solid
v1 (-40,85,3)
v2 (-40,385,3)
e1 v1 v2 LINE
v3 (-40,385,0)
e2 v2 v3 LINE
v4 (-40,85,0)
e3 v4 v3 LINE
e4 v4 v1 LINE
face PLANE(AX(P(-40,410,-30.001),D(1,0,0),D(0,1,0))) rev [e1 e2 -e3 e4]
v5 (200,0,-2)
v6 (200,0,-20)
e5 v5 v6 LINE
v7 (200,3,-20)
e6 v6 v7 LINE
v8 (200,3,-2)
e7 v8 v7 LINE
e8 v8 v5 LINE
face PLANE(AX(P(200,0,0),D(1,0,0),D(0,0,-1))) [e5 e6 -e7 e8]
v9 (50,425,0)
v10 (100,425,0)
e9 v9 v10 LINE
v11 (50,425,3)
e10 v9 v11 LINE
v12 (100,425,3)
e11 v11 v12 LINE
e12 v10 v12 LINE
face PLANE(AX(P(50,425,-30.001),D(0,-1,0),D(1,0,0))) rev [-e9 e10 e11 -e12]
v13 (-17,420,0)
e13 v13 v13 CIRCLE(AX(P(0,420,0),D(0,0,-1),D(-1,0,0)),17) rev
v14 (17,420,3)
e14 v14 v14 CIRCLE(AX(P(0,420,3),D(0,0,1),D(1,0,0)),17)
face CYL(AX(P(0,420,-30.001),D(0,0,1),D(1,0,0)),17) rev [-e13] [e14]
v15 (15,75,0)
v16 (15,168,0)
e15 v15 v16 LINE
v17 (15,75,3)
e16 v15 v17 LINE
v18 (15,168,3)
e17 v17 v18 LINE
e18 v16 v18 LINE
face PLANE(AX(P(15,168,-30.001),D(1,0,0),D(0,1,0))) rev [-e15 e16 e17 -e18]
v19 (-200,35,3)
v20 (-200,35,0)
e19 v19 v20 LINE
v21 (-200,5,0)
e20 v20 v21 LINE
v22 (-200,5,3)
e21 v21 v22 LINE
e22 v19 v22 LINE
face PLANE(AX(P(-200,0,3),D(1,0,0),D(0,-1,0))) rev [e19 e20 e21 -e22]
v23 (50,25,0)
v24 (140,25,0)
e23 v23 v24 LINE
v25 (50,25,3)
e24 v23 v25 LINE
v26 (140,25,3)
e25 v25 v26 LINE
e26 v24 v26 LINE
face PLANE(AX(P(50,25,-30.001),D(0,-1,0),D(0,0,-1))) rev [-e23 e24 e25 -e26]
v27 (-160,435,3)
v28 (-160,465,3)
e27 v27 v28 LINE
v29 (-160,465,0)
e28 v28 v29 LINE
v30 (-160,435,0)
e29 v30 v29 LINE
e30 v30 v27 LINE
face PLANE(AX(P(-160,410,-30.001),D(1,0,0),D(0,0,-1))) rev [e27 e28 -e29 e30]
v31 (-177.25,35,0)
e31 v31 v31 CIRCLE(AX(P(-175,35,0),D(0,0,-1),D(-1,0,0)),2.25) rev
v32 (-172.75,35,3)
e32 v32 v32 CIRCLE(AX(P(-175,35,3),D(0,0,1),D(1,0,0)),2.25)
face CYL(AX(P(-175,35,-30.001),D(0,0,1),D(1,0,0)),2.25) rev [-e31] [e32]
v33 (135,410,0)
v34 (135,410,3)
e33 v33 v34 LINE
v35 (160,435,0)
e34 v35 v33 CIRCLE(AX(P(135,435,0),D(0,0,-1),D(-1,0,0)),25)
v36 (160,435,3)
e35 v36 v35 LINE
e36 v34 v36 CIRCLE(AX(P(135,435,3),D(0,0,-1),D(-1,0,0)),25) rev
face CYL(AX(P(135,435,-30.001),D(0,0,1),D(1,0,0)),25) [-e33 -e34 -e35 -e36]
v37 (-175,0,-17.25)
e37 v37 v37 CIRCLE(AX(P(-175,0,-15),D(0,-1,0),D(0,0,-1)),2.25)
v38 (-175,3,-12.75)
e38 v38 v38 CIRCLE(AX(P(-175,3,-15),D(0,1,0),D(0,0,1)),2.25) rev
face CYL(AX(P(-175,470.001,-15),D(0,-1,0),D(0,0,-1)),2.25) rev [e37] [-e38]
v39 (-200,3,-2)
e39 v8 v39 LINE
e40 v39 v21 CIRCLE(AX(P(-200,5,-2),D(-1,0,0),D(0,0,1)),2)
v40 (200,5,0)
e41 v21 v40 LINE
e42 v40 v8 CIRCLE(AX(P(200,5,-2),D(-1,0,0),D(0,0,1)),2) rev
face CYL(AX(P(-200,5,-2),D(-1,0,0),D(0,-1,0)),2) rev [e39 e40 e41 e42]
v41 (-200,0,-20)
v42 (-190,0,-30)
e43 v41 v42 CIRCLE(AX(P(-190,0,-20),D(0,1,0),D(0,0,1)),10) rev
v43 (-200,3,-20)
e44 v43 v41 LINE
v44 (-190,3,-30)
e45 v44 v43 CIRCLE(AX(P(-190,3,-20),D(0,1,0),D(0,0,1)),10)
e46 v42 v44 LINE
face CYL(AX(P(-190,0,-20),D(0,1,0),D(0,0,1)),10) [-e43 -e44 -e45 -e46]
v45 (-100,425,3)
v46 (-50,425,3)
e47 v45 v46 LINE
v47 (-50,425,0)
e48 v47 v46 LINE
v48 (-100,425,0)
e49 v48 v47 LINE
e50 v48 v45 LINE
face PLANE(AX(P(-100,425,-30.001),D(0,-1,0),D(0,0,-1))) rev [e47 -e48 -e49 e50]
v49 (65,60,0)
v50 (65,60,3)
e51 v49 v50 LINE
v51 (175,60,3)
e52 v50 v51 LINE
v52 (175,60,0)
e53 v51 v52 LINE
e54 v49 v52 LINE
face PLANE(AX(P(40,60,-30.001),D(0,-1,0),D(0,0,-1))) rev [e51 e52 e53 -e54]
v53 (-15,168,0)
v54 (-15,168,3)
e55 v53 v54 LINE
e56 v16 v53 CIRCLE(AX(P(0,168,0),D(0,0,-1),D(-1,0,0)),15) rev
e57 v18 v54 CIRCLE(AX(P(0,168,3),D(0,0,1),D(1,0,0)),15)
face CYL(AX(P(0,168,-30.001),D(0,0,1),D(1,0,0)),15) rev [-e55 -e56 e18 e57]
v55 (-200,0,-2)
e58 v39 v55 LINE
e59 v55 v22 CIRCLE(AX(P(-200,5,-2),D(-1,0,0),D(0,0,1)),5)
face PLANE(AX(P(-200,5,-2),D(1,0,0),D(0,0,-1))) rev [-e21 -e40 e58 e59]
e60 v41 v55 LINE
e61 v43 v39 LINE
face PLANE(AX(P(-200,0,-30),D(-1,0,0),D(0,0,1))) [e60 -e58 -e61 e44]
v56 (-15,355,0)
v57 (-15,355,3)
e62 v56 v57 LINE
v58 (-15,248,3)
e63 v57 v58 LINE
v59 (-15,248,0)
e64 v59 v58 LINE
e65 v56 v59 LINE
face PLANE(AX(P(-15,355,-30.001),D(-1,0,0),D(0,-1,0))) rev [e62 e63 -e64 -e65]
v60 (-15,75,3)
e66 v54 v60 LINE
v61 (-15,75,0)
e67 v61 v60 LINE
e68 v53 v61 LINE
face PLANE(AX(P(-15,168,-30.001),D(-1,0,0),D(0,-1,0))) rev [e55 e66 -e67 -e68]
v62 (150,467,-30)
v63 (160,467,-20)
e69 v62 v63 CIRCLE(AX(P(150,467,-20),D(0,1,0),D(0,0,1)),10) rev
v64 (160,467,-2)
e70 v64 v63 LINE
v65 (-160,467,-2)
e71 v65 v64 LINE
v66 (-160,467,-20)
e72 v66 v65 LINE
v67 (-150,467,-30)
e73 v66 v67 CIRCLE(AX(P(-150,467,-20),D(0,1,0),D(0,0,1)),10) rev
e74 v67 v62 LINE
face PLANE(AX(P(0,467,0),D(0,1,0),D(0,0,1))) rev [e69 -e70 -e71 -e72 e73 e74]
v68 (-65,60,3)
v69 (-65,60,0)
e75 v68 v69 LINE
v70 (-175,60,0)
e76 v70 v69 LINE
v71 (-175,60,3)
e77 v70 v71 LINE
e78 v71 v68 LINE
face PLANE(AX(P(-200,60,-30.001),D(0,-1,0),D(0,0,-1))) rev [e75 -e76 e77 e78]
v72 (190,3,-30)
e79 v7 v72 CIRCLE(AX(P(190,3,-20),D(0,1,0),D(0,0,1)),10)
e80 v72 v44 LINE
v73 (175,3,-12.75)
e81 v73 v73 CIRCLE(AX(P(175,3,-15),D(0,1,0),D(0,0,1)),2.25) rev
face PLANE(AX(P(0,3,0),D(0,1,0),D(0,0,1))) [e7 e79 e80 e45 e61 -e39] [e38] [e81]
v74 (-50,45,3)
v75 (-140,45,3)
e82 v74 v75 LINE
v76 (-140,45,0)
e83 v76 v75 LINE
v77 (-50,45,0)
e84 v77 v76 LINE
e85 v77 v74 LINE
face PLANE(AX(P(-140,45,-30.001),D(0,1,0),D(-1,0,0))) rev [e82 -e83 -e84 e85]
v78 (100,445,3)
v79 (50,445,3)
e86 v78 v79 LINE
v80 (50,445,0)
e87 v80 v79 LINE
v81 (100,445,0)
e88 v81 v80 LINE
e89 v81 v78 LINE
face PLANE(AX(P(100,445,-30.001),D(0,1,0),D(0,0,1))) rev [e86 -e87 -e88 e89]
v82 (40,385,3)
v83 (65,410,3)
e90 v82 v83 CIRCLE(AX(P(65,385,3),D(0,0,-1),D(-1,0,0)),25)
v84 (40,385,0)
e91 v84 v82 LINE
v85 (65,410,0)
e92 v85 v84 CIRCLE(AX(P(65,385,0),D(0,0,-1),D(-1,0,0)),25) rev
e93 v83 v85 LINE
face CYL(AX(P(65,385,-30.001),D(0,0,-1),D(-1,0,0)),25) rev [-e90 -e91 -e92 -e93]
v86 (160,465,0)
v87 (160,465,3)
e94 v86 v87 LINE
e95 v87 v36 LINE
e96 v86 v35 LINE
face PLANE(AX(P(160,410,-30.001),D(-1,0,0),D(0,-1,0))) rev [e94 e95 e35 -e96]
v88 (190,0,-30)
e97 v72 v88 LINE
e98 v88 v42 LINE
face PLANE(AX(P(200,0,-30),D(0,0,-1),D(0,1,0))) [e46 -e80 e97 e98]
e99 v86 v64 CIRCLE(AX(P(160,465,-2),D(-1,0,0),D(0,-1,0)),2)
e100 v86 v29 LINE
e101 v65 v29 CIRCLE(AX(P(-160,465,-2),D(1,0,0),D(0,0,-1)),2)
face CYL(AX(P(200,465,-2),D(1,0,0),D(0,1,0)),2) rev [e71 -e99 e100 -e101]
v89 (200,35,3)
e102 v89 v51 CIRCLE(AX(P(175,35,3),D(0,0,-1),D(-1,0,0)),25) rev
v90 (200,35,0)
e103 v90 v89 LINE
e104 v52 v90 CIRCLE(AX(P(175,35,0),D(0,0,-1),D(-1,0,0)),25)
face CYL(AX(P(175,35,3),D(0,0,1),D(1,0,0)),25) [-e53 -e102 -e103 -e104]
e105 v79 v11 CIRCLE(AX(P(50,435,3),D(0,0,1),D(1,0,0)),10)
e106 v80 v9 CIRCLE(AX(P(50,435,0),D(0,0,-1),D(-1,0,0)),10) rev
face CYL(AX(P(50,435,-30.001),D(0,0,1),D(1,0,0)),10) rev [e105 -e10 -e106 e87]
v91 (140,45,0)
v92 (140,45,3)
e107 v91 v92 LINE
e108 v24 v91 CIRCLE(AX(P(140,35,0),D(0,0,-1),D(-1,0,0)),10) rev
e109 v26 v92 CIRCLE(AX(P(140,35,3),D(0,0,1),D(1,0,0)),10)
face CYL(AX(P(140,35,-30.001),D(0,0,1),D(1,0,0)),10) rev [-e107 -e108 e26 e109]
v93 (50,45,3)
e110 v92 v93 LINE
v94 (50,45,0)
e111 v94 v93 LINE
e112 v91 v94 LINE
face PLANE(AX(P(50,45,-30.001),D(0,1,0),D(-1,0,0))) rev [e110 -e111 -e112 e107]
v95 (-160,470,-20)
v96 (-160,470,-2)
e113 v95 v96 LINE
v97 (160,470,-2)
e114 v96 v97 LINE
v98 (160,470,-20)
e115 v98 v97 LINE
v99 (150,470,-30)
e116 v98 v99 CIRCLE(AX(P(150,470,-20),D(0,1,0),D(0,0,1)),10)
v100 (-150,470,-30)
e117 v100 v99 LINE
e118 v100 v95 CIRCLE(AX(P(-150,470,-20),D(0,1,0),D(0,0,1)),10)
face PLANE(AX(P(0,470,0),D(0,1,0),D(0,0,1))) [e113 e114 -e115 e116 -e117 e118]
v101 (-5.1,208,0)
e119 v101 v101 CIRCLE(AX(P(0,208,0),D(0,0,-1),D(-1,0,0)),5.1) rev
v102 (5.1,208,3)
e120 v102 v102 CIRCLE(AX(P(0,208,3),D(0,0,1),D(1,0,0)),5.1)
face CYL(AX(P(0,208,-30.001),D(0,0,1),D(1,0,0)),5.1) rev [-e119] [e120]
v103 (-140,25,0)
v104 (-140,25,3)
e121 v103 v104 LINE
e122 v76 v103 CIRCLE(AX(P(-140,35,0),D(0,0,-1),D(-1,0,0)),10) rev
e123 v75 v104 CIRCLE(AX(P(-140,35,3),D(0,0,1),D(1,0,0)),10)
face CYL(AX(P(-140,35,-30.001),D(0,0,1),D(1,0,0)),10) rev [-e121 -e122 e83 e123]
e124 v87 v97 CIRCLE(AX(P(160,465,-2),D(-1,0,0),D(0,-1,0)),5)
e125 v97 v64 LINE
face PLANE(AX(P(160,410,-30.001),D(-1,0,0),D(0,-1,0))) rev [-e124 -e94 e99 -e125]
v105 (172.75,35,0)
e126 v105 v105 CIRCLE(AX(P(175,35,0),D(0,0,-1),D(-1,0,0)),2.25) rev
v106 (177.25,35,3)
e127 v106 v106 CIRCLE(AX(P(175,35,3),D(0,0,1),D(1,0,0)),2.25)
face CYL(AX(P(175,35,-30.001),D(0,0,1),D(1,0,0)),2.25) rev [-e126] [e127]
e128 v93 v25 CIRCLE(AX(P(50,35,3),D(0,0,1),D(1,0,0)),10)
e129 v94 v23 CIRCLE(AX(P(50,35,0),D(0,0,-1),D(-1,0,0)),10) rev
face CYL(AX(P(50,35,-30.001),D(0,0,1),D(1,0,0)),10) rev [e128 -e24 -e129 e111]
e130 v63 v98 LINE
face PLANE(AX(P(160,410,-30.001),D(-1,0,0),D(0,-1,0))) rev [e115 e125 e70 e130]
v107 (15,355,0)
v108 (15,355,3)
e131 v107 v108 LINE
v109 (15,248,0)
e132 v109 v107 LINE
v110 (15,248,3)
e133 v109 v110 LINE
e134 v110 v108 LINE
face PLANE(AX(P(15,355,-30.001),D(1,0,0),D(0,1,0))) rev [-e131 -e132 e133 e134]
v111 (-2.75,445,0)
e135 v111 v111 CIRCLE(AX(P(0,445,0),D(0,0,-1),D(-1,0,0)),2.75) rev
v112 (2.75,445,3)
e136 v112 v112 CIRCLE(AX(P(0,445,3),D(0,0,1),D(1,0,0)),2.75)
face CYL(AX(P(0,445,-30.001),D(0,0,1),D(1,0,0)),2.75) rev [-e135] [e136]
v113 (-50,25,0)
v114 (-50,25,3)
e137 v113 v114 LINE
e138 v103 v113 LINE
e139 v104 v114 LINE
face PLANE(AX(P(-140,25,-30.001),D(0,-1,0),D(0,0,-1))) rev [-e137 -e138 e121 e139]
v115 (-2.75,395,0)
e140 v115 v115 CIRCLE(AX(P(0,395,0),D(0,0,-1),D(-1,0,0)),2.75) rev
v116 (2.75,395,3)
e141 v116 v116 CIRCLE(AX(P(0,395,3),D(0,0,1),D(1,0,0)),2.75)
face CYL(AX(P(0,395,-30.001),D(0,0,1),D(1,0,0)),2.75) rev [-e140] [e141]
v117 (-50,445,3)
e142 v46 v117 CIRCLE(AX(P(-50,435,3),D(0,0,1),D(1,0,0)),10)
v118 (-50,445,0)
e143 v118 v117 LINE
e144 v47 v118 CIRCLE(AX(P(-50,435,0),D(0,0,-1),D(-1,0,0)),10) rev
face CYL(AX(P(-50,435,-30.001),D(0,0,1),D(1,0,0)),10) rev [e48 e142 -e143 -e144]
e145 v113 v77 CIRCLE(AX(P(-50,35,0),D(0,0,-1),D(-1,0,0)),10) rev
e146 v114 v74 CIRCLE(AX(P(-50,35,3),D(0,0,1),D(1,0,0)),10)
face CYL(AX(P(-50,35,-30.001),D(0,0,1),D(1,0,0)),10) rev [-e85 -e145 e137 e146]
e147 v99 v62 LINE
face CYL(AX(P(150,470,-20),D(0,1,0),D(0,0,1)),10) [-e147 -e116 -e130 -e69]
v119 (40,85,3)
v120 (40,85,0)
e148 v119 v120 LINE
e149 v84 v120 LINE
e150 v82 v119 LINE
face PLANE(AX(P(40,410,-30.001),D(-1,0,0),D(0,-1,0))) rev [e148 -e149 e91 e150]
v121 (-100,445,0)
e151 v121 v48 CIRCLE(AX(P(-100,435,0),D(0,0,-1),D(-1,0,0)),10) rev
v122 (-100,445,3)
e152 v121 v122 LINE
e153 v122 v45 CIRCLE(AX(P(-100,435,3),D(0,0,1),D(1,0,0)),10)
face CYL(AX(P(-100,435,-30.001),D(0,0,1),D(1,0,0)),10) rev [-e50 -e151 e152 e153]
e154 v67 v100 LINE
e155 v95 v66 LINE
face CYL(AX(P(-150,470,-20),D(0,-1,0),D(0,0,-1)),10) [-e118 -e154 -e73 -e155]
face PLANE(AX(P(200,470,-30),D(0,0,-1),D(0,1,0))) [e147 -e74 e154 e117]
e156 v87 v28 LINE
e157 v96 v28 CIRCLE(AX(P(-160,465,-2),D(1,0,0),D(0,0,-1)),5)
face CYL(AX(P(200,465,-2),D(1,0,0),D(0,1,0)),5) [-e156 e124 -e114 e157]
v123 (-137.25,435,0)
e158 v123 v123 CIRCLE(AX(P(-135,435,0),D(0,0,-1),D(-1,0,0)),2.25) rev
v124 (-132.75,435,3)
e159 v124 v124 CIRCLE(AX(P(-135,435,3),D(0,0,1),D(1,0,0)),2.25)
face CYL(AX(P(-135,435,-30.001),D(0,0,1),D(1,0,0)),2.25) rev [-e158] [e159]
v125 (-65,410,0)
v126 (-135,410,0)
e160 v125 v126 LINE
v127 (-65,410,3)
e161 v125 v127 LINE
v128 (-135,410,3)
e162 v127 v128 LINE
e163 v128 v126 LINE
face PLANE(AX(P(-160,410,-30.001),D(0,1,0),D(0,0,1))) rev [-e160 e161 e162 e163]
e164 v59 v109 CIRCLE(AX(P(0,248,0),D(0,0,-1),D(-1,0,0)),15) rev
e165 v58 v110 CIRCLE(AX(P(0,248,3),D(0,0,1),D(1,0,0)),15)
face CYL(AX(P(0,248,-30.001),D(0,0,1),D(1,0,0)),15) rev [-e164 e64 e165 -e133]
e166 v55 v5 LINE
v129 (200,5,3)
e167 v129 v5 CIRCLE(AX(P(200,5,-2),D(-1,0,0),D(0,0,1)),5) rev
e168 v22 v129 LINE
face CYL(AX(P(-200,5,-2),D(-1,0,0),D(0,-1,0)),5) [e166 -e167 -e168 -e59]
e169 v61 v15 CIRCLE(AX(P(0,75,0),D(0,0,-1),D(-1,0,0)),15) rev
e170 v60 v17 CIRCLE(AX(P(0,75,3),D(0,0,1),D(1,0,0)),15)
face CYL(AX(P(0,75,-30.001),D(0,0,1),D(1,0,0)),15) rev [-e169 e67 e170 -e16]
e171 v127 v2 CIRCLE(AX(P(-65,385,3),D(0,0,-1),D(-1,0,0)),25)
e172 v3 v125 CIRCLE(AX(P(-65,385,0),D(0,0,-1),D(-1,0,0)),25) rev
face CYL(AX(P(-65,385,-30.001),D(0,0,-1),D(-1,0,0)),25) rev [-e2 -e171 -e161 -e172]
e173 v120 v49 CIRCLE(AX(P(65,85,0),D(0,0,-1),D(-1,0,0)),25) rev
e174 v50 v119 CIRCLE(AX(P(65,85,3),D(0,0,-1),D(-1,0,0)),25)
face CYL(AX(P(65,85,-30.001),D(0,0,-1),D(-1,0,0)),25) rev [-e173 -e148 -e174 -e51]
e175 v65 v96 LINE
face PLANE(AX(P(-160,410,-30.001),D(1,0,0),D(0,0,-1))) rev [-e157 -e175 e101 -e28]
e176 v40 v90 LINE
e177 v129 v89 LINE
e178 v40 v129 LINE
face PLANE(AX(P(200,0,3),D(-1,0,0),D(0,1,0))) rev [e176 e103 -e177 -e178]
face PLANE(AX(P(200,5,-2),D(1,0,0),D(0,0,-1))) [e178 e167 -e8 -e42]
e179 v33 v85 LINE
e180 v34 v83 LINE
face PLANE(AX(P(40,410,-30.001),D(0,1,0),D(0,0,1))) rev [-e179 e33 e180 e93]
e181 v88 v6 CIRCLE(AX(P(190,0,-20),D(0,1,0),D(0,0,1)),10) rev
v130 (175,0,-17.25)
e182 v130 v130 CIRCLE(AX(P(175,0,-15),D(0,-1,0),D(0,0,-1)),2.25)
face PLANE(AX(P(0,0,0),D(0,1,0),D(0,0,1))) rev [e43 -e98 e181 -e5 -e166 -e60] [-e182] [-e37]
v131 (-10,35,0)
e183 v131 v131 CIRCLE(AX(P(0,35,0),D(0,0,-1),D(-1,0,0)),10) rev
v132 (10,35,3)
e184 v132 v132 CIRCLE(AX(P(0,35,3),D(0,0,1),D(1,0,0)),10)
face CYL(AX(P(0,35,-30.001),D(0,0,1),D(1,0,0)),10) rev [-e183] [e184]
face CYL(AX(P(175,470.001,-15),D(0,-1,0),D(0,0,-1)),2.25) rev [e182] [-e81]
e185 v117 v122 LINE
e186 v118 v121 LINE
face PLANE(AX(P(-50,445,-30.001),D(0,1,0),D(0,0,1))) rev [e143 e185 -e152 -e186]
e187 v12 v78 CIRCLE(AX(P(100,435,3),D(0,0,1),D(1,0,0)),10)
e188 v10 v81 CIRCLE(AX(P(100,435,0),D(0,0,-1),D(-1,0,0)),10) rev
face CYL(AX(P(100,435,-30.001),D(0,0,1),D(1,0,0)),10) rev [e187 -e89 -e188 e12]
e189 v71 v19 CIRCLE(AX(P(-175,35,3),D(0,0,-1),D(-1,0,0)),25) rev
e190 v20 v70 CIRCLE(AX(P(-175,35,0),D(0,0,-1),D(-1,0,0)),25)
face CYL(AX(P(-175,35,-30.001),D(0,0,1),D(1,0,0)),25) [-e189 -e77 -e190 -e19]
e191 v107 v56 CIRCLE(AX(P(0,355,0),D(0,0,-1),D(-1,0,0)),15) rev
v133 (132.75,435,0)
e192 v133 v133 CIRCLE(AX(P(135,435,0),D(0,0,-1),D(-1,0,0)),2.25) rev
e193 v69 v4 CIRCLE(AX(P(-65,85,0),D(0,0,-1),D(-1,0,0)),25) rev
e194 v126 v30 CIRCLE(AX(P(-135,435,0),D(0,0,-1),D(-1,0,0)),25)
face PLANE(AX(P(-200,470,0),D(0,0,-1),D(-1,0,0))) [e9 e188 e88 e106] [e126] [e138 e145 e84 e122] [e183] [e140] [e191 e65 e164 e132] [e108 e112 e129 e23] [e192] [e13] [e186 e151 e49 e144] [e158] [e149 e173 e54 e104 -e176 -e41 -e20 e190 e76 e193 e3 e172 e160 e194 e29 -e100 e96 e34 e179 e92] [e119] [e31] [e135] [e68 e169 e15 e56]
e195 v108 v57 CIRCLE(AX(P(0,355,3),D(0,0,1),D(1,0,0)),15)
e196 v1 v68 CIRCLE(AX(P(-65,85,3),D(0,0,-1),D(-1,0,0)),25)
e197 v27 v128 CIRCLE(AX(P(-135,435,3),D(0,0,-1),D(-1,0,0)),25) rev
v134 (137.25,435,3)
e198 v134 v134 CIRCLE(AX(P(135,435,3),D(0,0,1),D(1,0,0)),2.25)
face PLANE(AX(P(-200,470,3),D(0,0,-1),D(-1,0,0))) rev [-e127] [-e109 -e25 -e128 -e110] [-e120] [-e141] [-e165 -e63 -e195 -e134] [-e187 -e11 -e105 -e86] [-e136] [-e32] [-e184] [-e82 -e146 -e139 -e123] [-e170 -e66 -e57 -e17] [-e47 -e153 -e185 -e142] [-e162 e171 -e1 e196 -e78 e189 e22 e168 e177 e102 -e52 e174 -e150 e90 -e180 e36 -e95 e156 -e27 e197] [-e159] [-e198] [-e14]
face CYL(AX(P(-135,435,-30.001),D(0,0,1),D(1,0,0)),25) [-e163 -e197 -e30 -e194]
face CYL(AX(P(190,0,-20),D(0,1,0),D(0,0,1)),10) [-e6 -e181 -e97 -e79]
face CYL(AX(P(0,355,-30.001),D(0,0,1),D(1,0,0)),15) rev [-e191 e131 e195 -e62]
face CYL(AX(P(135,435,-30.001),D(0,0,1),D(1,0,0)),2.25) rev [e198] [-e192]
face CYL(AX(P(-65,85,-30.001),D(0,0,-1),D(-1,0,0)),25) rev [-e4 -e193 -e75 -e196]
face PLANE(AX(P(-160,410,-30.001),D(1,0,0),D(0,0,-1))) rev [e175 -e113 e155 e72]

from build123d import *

# Parameters (mm, degrees)
ESQUISSE1_W                             = 400
ESQUISSE1_H                             = 470
BOSS_EXTRU_1_DEPTH                      = 3
T_LE_PLI_E_SUR_AR_TE1_STRIP_W           = 16
T_LE_PLI_E_SUR_AR_TE1_STRIP_H           = 3
T_LE_PLI_E_SUR_AR_TE1_STRIP_CUT_DEPTH   = 400
T_LE_PLI_E_SUR_AR_TE1_STRIP_2_W         = 16
T_LE_PLI_E_SUR_AR_TE1_STRIP_2_H         = 3
T_LE_PLI_E_SUR_AR_TE1_STRIP_CUT_2_DEPTH = 400
T_LE_PLI_E_SUR_AR_TE1_DEPTH             = 400
T_LE_PLI_E_SUR_AR_TE1_BEND_DEPTH        = 400
ENL_V_MAT_EXTRU_1_REACH                 = 513.849
ESQUISSE7_R                             = 5.1
ESQUISSE7_R_2                           = 17
ESQUISSE7_R_3                           = 2.75
ESQUISSE7_R_4                           = 2.25
ENL_V_MAT_EXTRU_6_REACH                 = 513.849
ESQUISSE14_R                            = 10
CONG_10_R                               = 10
CONG_2_R                                = 25
ENL_V_MAT_EXTRU_2_REACH                 = 513.664
ESQUISSE8_R                             = 2.25


# Sheet-metal steps are written as plain solids
with BuildPart() as part:
    # Esquisse1 → Boss.-Extru.1 (new body)
    with BuildSketch(Plane.XY):
        with Locations((0, 235)):
            Rectangle(ESQUISSE1_W, ESQUISSE1_H)
    extrude(amount=BOSS_EXTRU_1_DEPTH)

    # Tôle pliée sur arête1 strip (across the edge) → Tôle pliée sur arête1 strip cut (cut)
    with BuildSketch(Plane(origin=(-200, 470, 0), x_dir=(0, -1, 0), z_dir=(1, 0, 0))):
        with Locations((-3, -1.5)):
            Rectangle(T_LE_PLI_E_SUR_AR_TE1_STRIP_W, T_LE_PLI_E_SUR_AR_TE1_STRIP_H)
    extrude(amount=T_LE_PLI_E_SUR_AR_TE1_STRIP_CUT_DEPTH, mode=Mode.SUBTRACT)

    # Tôle pliée sur arête1 strip 2 (across the edge) → Tôle pliée sur arête1 strip cut 2 (cut)
    with BuildSketch(Plane(origin=(200, 0, 0), x_dir=(0, 1, 0), z_dir=(-1, 0, 0))):
        with Locations((-3, -1.5)):
            Rectangle(T_LE_PLI_E_SUR_AR_TE1_STRIP_2_W, T_LE_PLI_E_SUR_AR_TE1_STRIP_2_H)
    extrude(amount=T_LE_PLI_E_SUR_AR_TE1_STRIP_CUT_2_DEPTH, mode=Mode.SUBTRACT)

    # Tôle pliée sur arête1 section (across the edge) → Tôle pliée sur arête1 (add)
    with BuildSketch(Plane(origin=(-200, 470, 0), x_dir=(0, -1, 0), z_dir=(1, 0, 0))):
        with BuildLine():
            Line((0, 2), (0, 30))
            Line((0, 30), (3, 30))
            Line((3, 30), (3, 2))
            ThreePointArc((3, 2), (3.585786438, 0.585786438), (5, 0))
            Line((5, 0), (5, -3))
            ThreePointArc((5, -3), (1.464466094, -1.535533906), (0, 2))
        make_face()
    extrude(amount=T_LE_PLI_E_SUR_AR_TE1_DEPTH)

    # Tôle pliée sur arête1 section 2 (across the edge) → Tôle pliée sur arête1 bend (add)
    with BuildSketch(Plane(origin=(200, 0, 0), x_dir=(0, 1, 0), z_dir=(-1, 0, 0))):
        with BuildLine():
            Line((0, 2), (0, 30))
            Line((0, 30), (3, 30))
            Line((3, 30), (3, 2))
            ThreePointArc((3, 2), (3.585786438, 0.585786438), (5, 0))
            Line((5, 0), (5, -3))
            ThreePointArc((5, -3), (1.464466094, -1.535533906), (0, 2))
        make_face()
    extrude(amount=T_LE_PLI_E_SUR_AR_TE1_BEND_DEPTH)

    # Esquisse7 → Enlèv. mat.-Extru.1 (cut, up to next)
    with BuildSketch(Plane.XY.offset(3), mode=Mode.PRIVATE) as enl_v_mat_extru_1_sk1:
        with Locations((0, 208)):
            Circle(ESQUISSE7_R)
    enl_v_mat_extru_1_tool1 = extrude(enl_v_mat_extru_1_sk1.sketch, amount=-ENL_V_MAT_EXTRU_1_REACH, mode=Mode.PRIVATE) & part.part
    # Esquisse7 → Enlèv. mat.-Extru.1 (cut, up to next)
    with BuildSketch(Plane.XY.offset(3), mode=Mode.PRIVATE) as enl_v_mat_extru_1_sk2:
        with Locations((0, 420)):
            Circle(ESQUISSE7_R_2)
    enl_v_mat_extru_1_tool2 = extrude(enl_v_mat_extru_1_sk2.sketch, amount=-ENL_V_MAT_EXTRU_1_REACH, mode=Mode.PRIVATE) & part.part
    # Esquisse7 → Enlèv. mat.-Extru.1 (cut, up to next)
    with BuildSketch(Plane.XY.offset(3), mode=Mode.PRIVATE) as enl_v_mat_extru_1_sk3:
        with Locations((0, 445)):
            Circle(ESQUISSE7_R_3)
    enl_v_mat_extru_1_tool3 = extrude(enl_v_mat_extru_1_sk3.sketch, amount=-ENL_V_MAT_EXTRU_1_REACH, mode=Mode.PRIVATE) & part.part
    # Esquisse7 → Enlèv. mat.-Extru.1 (cut, up to next)
    with BuildSketch(Plane.XY.offset(3), mode=Mode.PRIVATE) as enl_v_mat_extru_1_sk4:
        with Locations((0, 395)):
            Circle(ESQUISSE7_R_3)
    enl_v_mat_extru_1_tool4 = extrude(enl_v_mat_extru_1_sk4.sketch, amount=-ENL_V_MAT_EXTRU_1_REACH, mode=Mode.PRIVATE) & part.part
    # Esquisse7 → Enlèv. mat.-Extru.1 (cut, up to next)
    with BuildSketch(Plane.XY.offset(3), mode=Mode.PRIVATE) as enl_v_mat_extru_1_sk5:
        with Locations((-175, 35)):
            Circle(ESQUISSE7_R_4)
    enl_v_mat_extru_1_tool5 = extrude(enl_v_mat_extru_1_sk5.sketch, amount=-ENL_V_MAT_EXTRU_1_REACH, mode=Mode.PRIVATE) & part.part
    # Esquisse7 → Enlèv. mat.-Extru.1 (cut, up to next)
    with BuildSketch(Plane.XY.offset(3), mode=Mode.PRIVATE) as enl_v_mat_extru_1_sk6:
        with Locations((175, 35)):
            Circle(ESQUISSE7_R_4)
    enl_v_mat_extru_1_tool6 = extrude(enl_v_mat_extru_1_sk6.sketch, amount=-ENL_V_MAT_EXTRU_1_REACH, mode=Mode.PRIVATE) & part.part
    # Esquisse7 → Enlèv. mat.-Extru.1 (cut, up to next)
    with BuildSketch(Plane.XY.offset(3), mode=Mode.PRIVATE) as enl_v_mat_extru_1_sk7:
        with Locations((-135, 435)):
            Circle(ESQUISSE7_R_4)
    enl_v_mat_extru_1_tool7 = extrude(enl_v_mat_extru_1_sk7.sketch, amount=-ENL_V_MAT_EXTRU_1_REACH, mode=Mode.PRIVATE) & part.part
    # Esquisse7 → Enlèv. mat.-Extru.1 (cut, up to next)
    with BuildSketch(Plane.XY.offset(3), mode=Mode.PRIVATE) as enl_v_mat_extru_1_sk8:
        with Locations((135, 435)):
            Circle(ESQUISSE7_R_4)
    enl_v_mat_extru_1_tool8 = extrude(enl_v_mat_extru_1_sk8.sketch, amount=-ENL_V_MAT_EXTRU_1_REACH, mode=Mode.PRIVATE) & part.part
    # Esquisse7 → Enlèv. mat.-Extru.1 (cut, up to next)
    with BuildSketch(Plane.XY.offset(3), mode=Mode.PRIVATE) as enl_v_mat_extru_1_sk9:
        Polygon((-200, 60), (-40, 60), (-40, 410), (-160, 410), (-160, 470), (-200, 470), align=None)
    enl_v_mat_extru_1_tool9 = extrude(enl_v_mat_extru_1_sk9.sketch, amount=-ENL_V_MAT_EXTRU_1_REACH, mode=Mode.PRIVATE) & part.part
    # Esquisse7 → Enlèv. mat.-Extru.1 (cut, up to next)
    with BuildSketch(Plane.XY.offset(3), mode=Mode.PRIVATE) as enl_v_mat_extru_1_sk10:
        Polygon((200, 470), (200, 60), (40, 60), (40, 410), (160, 410), (160, 470), align=None)
    enl_v_mat_extru_1_tool10 = extrude(enl_v_mat_extru_1_sk10.sketch, amount=-ENL_V_MAT_EXTRU_1_REACH, mode=Mode.PRIVATE) & part.part
    add(enl_v_mat_extru_1_tool1.solids().sort_by_distance((0, 208, 3))[0], mode=Mode.SUBTRACT)
    add(enl_v_mat_extru_1_tool2.solids().sort_by_distance((0, 420, 3))[0], mode=Mode.SUBTRACT)
    add(enl_v_mat_extru_1_tool3.solids().sort_by_distance((0, 445, 3))[0], mode=Mode.SUBTRACT)
    add(enl_v_mat_extru_1_tool4.solids().sort_by_distance((0, 395, 3))[0], mode=Mode.SUBTRACT)
    add(enl_v_mat_extru_1_tool5.solids().sort_by_distance((-175, 35, 3))[0], mode=Mode.SUBTRACT)
    add(enl_v_mat_extru_1_tool6.solids().sort_by_distance((175, 35, 3))[0], mode=Mode.SUBTRACT)
    add(enl_v_mat_extru_1_tool7.solids().sort_by_distance((-135, 435, 3))[0], mode=Mode.SUBTRACT)
    add(enl_v_mat_extru_1_tool8.solids().sort_by_distance((135, 435, 3))[0], mode=Mode.SUBTRACT)
    add(enl_v_mat_extru_1_tool9.solids().sort_by_distance((-122.465753, 243.424658, 3))[0], mode=Mode.SUBTRACT)
    add(enl_v_mat_extru_1_tool10.solids().sort_by_distance((122.465753, 243.424658, 3))[0], mode=Mode.SUBTRACT)

    # Esquisse14 → Enlèv. mat.-Extru.6 (cut, up to next)
    with BuildSketch(Plane.XY.offset(3), mode=Mode.PRIVATE) as enl_v_mat_extru_6_sk1:
        with Locations((0, 35)):
            Circle(ESQUISSE14_R)
    enl_v_mat_extru_6_tool1 = extrude(enl_v_mat_extru_6_sk1.sketch, amount=-ENL_V_MAT_EXTRU_6_REACH, mode=Mode.PRIVATE) & part.part
    # Esquisse14 → Enlèv. mat.-Extru.6 (cut, up to next)
    with BuildSketch(Plane.XY.offset(3), mode=Mode.PRIVATE) as enl_v_mat_extru_6_sk2:
        with BuildLine():
            Line((-140, 45), (-50, 45))
            ThreePointArc((-50, 45), (-40, 35), (-50, 25))
            Line((-50, 25), (-140, 25))
            ThreePointArc((-140, 25), (-150, 35), (-140, 45))
        make_face()
    enl_v_mat_extru_6_tool2 = extrude(enl_v_mat_extru_6_sk2.sketch, amount=-ENL_V_MAT_EXTRU_6_REACH, mode=Mode.PRIVATE) & part.part
    # Esquisse14 → Enlèv. mat.-Extru.6 (cut, up to next)
    with BuildSketch(Plane.XY.offset(3), mode=Mode.PRIVATE) as enl_v_mat_extru_6_sk3:
        with BuildLine():
            Line((50, 45), (140, 45))
            ThreePointArc((140, 45), (150, 35), (140, 25))
            Line((140, 25), (50, 25))
            ThreePointArc((50, 25), (40, 35), (50, 45))
        make_face()
    enl_v_mat_extru_6_tool3 = extrude(enl_v_mat_extru_6_sk3.sketch, amount=-ENL_V_MAT_EXTRU_6_REACH, mode=Mode.PRIVATE) & part.part
    # Esquisse14 → Enlèv. mat.-Extru.6 (cut, up to next)
    with BuildSketch(Plane.XY.offset(3), mode=Mode.PRIVATE) as enl_v_mat_extru_6_sk4:
        with BuildLine():
            Line((-15, 168), (-15, 75))
            ThreePointArc((-15, 75), (0, 60), (15, 75))
            Line((15, 75), (15, 168))
            ThreePointArc((15, 168), (0, 183), (-15, 168))
        make_face()
    enl_v_mat_extru_6_tool4 = extrude(enl_v_mat_extru_6_sk4.sketch, amount=-ENL_V_MAT_EXTRU_6_REACH, mode=Mode.PRIVATE) & part.part
    # Esquisse14 → Enlèv. mat.-Extru.6 (cut, up to next)
    with BuildSketch(Plane.XY.offset(3), mode=Mode.PRIVATE) as enl_v_mat_extru_6_sk5:
        with BuildLine():
            Line((-15, 355), (-15, 248))
            ThreePointArc((-15, 248), (0, 233), (15, 248))
            Line((15, 248), (15, 355))
            ThreePointArc((15, 355), (0, 370), (-15, 355))
        make_face()
    enl_v_mat_extru_6_tool5 = extrude(enl_v_mat_extru_6_sk5.sketch, amount=-ENL_V_MAT_EXTRU_6_REACH, mode=Mode.PRIVATE) & part.part
    # Esquisse14 → Enlèv. mat.-Extru.6 (cut, up to next)
    with BuildSketch(Plane.XY.offset(3), mode=Mode.PRIVATE) as enl_v_mat_extru_6_sk6:
        with BuildLine():
            Line((100, 445), (50, 445))
            ThreePointArc((50, 445), (40, 435), (50, 425))
            Line((50, 425), (100, 425))
            ThreePointArc((100, 425), (110, 435), (100, 445))
        make_face()
    enl_v_mat_extru_6_tool6 = extrude(enl_v_mat_extru_6_sk6.sketch, amount=-ENL_V_MAT_EXTRU_6_REACH, mode=Mode.PRIVATE) & part.part
    # Esquisse14 → Enlèv. mat.-Extru.6 (cut, up to next)
    with BuildSketch(Plane.XY.offset(3), mode=Mode.PRIVATE) as enl_v_mat_extru_6_sk7:
        with BuildLine():
            Line((-50, 445), (-100, 445))
            ThreePointArc((-100, 445), (-110, 435), (-100, 425))
            Line((-100, 425), (-50, 425))
            ThreePointArc((-50, 425), (-40, 435), (-50, 445))
        make_face()
    enl_v_mat_extru_6_tool7 = extrude(enl_v_mat_extru_6_sk7.sketch, amount=-ENL_V_MAT_EXTRU_6_REACH, mode=Mode.PRIVATE) & part.part
    add(enl_v_mat_extru_6_tool1.solids().sort_by_distance((0, 35, 3))[0], mode=Mode.SUBTRACT)
    add(enl_v_mat_extru_6_tool2.solids().sort_by_distance((-95, 35, 3))[0], mode=Mode.SUBTRACT)
    add(enl_v_mat_extru_6_tool3.solids().sort_by_distance((95, 35, 3))[0], mode=Mode.SUBTRACT)
    add(enl_v_mat_extru_6_tool4.solids().sort_by_distance((0, 121.5, 3))[0], mode=Mode.SUBTRACT)
    add(enl_v_mat_extru_6_tool5.solids().sort_by_distance((0, 301.5, 3))[0], mode=Mode.SUBTRACT)
    add(enl_v_mat_extru_6_tool6.solids().sort_by_distance((75, 435, 3))[0], mode=Mode.SUBTRACT)
    add(enl_v_mat_extru_6_tool7.solids().sort_by_distance((-75, 435, 3))[0], mode=Mode.SUBTRACT)

    # Congé 10
    cong_10_edges = [part.edges().sort_by_distance(p)[0] for p in [
        (160, 468.5, -30),
        (200, 1.5, -30),
        (-200, 1.5, -30),
        (-160, 468.5, -30),
    ]]
    fillet(cong_10_edges, radius=CONG_10_R)

    # Congé2
    cong_2_edges = [part.edges().sort_by_distance(p)[0] for p in [
        (200, 60, 1.5),
        (40, 60, 1.5),
        (40, 410, 1.5),
        (160, 410, 1.5),
        (-200, 60, 1.5),
        (-160, 410, 1.5),
        (-40, 410, 1.5),
        (-40, 60, 1.5),
    ]]
    fillet(cong_2_edges, radius=CONG_2_R)

    # Esquisse8 → Enlèv. mat.-Extru.2 (cut, up to next)
    with BuildSketch(Plane(origin=(0, 0, 0), x_dir=(-1, 0, 0), z_dir=(0, -1, 0)), mode=Mode.PRIVATE) as enl_v_mat_extru_2_sk1:
        with Locations(Location((175, 15, 0), (0, 0, 90))):
            Circle(ESQUISSE8_R)
    enl_v_mat_extru_2_tool1 = extrude(enl_v_mat_extru_2_sk1.sketch, amount=-ENL_V_MAT_EXTRU_2_REACH, mode=Mode.PRIVATE) & part.part
    # Esquisse8 → Enlèv. mat.-Extru.2 (cut, up to next)
    with BuildSketch(Plane(origin=(0, 0, 0), x_dir=(-1, 0, 0), z_dir=(0, -1, 0)), mode=Mode.PRIVATE) as enl_v_mat_extru_2_sk2:
        with Locations(Location((-175, 15, 0), (0, 0, 90))):
            Circle(ESQUISSE8_R)
    enl_v_mat_extru_2_tool2 = extrude(enl_v_mat_extru_2_sk2.sketch, amount=-ENL_V_MAT_EXTRU_2_REACH, mode=Mode.PRIVATE) & part.part
    add(enl_v_mat_extru_2_tool1.solids().sort_by_distance((-175, 0, -15))[0], mode=Mode.SUBTRACT)
    add(enl_v_mat_extru_2_tool2.solids().sort_by_distance((175, 0, -15))[0], mode=Mode.SUBTRACT)


solid = part.part
